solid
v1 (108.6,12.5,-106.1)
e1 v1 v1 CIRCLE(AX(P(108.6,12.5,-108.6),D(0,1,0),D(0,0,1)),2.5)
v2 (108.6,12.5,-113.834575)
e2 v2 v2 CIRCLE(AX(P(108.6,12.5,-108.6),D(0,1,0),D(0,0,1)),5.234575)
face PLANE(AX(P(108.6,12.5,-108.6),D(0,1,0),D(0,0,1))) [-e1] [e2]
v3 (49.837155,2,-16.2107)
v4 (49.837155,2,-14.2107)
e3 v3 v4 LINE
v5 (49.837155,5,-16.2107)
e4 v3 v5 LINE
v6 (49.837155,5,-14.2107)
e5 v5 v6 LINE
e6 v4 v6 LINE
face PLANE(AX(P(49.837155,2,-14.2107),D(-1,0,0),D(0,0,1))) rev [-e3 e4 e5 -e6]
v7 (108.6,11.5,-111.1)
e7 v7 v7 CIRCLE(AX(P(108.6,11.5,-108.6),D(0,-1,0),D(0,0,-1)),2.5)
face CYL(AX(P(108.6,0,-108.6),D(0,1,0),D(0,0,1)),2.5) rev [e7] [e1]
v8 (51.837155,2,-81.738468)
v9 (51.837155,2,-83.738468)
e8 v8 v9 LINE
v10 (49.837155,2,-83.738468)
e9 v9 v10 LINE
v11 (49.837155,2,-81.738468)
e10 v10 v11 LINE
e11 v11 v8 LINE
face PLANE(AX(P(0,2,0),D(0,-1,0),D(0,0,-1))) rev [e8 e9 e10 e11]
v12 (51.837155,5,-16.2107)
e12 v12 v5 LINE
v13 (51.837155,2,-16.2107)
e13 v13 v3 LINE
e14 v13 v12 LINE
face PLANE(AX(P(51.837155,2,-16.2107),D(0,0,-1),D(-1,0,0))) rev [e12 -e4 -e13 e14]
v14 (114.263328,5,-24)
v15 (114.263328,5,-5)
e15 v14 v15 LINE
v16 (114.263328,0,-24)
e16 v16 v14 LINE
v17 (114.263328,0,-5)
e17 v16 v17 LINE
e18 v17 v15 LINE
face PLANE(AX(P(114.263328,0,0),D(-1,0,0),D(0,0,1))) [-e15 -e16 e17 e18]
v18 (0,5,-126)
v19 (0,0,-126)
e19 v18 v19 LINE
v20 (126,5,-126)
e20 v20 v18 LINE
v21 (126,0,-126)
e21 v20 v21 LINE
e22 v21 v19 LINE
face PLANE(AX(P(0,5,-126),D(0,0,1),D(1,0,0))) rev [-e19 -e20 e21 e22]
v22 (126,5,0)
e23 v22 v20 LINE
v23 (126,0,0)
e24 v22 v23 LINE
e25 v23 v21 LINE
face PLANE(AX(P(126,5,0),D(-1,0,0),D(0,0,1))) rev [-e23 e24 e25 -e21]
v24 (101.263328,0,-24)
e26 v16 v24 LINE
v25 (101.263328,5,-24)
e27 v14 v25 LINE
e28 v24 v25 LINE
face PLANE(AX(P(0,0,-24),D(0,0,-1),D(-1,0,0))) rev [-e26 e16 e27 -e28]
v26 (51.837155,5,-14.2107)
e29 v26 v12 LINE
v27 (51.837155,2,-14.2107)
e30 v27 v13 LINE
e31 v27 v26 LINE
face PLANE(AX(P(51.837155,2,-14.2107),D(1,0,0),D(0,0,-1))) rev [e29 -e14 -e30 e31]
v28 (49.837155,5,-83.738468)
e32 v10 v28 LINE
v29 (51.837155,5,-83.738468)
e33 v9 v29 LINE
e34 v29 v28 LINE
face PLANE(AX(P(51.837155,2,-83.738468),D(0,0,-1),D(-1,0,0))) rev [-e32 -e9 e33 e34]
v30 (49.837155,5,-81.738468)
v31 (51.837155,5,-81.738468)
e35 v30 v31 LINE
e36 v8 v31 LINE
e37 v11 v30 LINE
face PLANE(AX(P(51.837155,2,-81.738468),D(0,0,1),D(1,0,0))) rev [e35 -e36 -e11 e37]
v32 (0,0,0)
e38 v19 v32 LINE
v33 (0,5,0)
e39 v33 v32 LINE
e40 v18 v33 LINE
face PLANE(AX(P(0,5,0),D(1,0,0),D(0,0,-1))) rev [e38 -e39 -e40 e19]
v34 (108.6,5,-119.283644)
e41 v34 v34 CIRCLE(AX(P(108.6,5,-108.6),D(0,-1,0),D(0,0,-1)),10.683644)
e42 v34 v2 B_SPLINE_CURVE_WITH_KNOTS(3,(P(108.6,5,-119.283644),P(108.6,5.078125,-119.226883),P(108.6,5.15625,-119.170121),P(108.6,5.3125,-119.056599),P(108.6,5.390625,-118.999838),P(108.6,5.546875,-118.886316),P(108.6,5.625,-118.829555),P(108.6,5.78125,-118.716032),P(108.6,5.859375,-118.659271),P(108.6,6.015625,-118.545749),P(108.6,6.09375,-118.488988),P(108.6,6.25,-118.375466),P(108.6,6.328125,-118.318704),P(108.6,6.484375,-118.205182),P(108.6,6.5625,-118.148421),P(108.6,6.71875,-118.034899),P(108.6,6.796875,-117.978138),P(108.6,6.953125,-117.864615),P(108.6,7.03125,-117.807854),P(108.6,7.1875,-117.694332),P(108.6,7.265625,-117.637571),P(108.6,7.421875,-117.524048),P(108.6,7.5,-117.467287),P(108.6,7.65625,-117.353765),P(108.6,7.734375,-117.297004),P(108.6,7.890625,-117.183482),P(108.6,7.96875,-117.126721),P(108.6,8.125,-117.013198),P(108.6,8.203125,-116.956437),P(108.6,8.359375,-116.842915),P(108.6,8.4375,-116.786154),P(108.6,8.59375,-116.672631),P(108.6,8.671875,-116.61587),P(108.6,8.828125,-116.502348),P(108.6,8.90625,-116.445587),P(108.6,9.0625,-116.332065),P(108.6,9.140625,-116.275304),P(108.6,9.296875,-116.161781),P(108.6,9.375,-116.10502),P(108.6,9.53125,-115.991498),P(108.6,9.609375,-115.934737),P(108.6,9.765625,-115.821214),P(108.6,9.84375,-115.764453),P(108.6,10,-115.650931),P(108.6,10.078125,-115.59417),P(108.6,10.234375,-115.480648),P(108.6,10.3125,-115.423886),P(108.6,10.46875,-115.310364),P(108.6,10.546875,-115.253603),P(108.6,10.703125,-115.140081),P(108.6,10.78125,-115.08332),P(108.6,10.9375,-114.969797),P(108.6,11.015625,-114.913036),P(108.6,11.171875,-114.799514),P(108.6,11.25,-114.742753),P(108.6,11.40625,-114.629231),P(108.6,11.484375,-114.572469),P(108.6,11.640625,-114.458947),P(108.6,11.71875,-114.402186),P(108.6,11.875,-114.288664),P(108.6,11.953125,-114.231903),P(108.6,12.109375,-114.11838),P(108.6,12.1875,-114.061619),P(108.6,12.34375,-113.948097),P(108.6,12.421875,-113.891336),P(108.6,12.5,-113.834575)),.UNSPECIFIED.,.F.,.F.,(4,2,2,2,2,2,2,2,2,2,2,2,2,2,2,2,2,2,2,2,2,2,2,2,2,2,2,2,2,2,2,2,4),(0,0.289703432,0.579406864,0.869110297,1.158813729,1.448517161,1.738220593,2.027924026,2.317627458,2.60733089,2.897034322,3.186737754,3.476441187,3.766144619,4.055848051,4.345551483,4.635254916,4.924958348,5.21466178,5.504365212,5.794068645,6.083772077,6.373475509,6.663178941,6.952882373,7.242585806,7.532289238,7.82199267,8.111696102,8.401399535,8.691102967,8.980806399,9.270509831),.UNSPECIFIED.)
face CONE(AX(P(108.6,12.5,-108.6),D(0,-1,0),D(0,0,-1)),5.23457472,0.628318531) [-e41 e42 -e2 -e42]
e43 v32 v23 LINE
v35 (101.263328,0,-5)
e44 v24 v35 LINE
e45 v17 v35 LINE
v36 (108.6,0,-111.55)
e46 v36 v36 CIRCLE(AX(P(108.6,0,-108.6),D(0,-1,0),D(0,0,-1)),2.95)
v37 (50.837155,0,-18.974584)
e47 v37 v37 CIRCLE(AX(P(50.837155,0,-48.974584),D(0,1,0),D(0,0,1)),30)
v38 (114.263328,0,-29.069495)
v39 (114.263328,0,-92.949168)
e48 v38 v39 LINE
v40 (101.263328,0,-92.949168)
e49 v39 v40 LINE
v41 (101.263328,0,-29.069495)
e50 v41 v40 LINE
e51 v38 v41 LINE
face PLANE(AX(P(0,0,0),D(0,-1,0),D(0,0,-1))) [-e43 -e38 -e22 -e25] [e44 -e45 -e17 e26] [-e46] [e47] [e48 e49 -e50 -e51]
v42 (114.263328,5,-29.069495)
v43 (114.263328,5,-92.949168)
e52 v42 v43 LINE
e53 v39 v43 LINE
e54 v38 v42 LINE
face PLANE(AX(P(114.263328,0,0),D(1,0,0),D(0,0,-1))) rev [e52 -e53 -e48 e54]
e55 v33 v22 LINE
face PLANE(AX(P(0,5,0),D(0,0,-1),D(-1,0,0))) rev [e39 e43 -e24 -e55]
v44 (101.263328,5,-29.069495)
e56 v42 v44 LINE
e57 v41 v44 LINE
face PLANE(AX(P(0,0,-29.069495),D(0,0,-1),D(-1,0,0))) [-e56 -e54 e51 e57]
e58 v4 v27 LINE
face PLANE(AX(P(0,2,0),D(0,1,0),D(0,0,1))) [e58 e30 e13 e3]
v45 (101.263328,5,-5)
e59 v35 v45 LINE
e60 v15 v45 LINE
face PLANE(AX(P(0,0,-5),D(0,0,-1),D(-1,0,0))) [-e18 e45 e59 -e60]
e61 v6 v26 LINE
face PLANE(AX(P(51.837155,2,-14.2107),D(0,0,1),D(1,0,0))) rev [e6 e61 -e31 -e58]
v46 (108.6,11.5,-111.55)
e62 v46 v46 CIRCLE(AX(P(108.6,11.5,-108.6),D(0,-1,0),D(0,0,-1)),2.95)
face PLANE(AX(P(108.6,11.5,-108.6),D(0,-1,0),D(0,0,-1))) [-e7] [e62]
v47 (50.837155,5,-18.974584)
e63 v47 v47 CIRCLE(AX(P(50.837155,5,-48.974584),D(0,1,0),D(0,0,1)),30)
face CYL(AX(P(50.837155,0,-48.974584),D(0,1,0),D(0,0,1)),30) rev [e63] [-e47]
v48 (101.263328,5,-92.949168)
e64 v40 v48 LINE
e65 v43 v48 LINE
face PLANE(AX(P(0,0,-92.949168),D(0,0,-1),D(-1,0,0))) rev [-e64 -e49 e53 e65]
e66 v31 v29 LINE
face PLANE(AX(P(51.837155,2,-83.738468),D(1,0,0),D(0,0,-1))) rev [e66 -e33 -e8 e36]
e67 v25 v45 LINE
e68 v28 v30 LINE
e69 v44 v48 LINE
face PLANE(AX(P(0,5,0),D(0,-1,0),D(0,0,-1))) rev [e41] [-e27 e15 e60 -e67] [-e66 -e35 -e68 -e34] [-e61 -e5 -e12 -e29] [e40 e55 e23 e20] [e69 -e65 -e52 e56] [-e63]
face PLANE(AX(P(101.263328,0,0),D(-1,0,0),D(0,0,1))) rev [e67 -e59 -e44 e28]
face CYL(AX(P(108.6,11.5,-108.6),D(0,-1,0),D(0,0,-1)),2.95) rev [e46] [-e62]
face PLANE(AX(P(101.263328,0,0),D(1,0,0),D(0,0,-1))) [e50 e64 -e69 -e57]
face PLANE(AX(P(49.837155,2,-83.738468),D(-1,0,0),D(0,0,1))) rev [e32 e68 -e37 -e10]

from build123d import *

# Parameters (mm, degrees)
SKETCH1_W           = 126
SKETCH1_H           = 126
BOSS_EXTRUDE1_DEPTH = 5
SKETCH3_R           = 12.5
BOSS_EXTRUDE2_DEPTH = 7.5
SKETCH4_R           = 2.95
CUT_EXTRUDE1_DEPTH  = 11.5
SKETCH6_R           = 2.5
CUT_EXTRUDE2_DEPTH  = 179.628805068
CHAMFER1_SIZE       = 10
CHAMFER1_SIZE_2     = 7.26542528
SKETCH8_W           = 13
SKETCH8_H           = 63.879672954
SKETCH8_H_2         = 19
CUT_EXTRUDE3_DEPTH  = 179.348675353
SKETCH9_R           = 30
CUT_EXTRUDE4_DEPTH  = 179.348675353
SKETCH11_W          = 2
SKETCH11_H          = 2
CUT_EXTRUDE5_DEPTH  = 3


with BuildPart() as part:
    # Sketch1 → Boss-Extrude1 (new body)
    with BuildSketch(Plane(origin=(0, 0, 0), x_dir=(1, 0, 0), z_dir=(0, 1, 0))):
        with Locations((63, 63)):
            Rectangle(SKETCH1_W, SKETCH1_H)
    extrude(amount=BOSS_EXTRUDE1_DEPTH)

    # Sketch3 → Boss-Extrude2 (add)
    with BuildSketch(Plane(origin=(0, 5, 0), x_dir=(1, 0, 0), z_dir=(0, 1, 0))):
        with Locations(Location((108.6, 108.6, 0), (0, 0, 90))):
            Circle(SKETCH3_R)
    extrude(amount=BOSS_EXTRUDE2_DEPTH)

    # Sketch4 → Cut-Extrude1 (cut)
    with BuildSketch(Plane.XZ):
        with Locations(Location((108.6, -108.6, 0), (0, 0, 270))):
            Circle(SKETCH4_R)
    extrude(amount=-CUT_EXTRUDE1_DEPTH, mode=Mode.SUBTRACT)

    # Sketch6 → Cut-Extrude2 (cut, through all)
    with BuildSketch(Plane(origin=(0, 12.5, 0), x_dir=(1, 0, 0), z_dir=(0, 1, 0))):
        with Locations(Location((108.6, 108.6, 0), (0, 0, 270))):
            Circle(SKETCH6_R)
    extrude(amount=-CUT_EXTRUDE2_DEPTH, mode=Mode.SUBTRACT)

    # Chamfer1
    # the kernel refuses this chamfer: 10, 7.26542528 mm, written as the material it takes off along each edge
    with BuildSketch(Plane(origin=(108.6, 12.5, -108.6), x_dir=(0, 0, -1), z_dir=(1, 0, 0))) as chamfer1_piece_1_section:
        Polygon((12.5, -CHAMFER1_SIZE), (12.5 - CHAMFER1_SIZE_2, 0), (12.5, 0), align=None)
    chamfer1_piece_1 = revolve(axis=Axis((108.6, 12.5, -108.6), (0, 1, 0)), mode=Mode.PRIVATE)
    chamfer1_piece_1 = split(chamfer1_piece_1, bisect_by=Plane(origin=(108.6, 5, -100.650989912), z_dir=(0, 1, 0)), keep=Keep.TOP, mode=Mode.PRIVATE)
    add(chamfer1_piece_1, mode=Mode.SUBTRACT)

    # Sketch8 → Cut-Extrude3 (cut, through all)
    with BuildSketch(Plane(origin=(0, 5, 0), x_dir=(1, 0, 0), z_dir=(0, 1, 0))):
        with Locations((107.763328316, 61.0093315)):
            Rectangle(SKETCH8_W, SKETCH8_H)
        with Locations((107.763328316, 14.5)):
            Rectangle(SKETCH8_W, SKETCH8_H_2)
    extrude(amount=-CUT_EXTRUDE3_DEPTH, mode=Mode.SUBTRACT)

    # Sketch9 → Cut-Extrude4 (cut, through all)
    with BuildSketch(Plane(origin=(0, 5, 0), x_dir=(1, 0, 0), z_dir=(0, 1, 0))):
        with Locations(Location((50.837155032, 48.974583989, 0), (0, 0, 270))):
            Circle(SKETCH9_R)
    extrude(amount=-CUT_EXTRUDE4_DEPTH, mode=Mode.SUBTRACT)

    # Sketch11 → Cut-Extrude5 (cut)
    with BuildSketch(Plane(origin=(0, 5, 0), x_dir=(1, 0, 0), z_dir=(0, 1, 0))):
        with Locations((50.837155032, 82.738467737)):
            Rectangle(SKETCH11_W, SKETCH11_H)
        with Locations((50.837155032, 15.21070024)):
            Rectangle(SKETCH11_W, SKETCH11_H)
    extrude(amount=-CUT_EXTRUDE5_DEPTH, mode=Mode.SUBTRACT)


solid = part.part
